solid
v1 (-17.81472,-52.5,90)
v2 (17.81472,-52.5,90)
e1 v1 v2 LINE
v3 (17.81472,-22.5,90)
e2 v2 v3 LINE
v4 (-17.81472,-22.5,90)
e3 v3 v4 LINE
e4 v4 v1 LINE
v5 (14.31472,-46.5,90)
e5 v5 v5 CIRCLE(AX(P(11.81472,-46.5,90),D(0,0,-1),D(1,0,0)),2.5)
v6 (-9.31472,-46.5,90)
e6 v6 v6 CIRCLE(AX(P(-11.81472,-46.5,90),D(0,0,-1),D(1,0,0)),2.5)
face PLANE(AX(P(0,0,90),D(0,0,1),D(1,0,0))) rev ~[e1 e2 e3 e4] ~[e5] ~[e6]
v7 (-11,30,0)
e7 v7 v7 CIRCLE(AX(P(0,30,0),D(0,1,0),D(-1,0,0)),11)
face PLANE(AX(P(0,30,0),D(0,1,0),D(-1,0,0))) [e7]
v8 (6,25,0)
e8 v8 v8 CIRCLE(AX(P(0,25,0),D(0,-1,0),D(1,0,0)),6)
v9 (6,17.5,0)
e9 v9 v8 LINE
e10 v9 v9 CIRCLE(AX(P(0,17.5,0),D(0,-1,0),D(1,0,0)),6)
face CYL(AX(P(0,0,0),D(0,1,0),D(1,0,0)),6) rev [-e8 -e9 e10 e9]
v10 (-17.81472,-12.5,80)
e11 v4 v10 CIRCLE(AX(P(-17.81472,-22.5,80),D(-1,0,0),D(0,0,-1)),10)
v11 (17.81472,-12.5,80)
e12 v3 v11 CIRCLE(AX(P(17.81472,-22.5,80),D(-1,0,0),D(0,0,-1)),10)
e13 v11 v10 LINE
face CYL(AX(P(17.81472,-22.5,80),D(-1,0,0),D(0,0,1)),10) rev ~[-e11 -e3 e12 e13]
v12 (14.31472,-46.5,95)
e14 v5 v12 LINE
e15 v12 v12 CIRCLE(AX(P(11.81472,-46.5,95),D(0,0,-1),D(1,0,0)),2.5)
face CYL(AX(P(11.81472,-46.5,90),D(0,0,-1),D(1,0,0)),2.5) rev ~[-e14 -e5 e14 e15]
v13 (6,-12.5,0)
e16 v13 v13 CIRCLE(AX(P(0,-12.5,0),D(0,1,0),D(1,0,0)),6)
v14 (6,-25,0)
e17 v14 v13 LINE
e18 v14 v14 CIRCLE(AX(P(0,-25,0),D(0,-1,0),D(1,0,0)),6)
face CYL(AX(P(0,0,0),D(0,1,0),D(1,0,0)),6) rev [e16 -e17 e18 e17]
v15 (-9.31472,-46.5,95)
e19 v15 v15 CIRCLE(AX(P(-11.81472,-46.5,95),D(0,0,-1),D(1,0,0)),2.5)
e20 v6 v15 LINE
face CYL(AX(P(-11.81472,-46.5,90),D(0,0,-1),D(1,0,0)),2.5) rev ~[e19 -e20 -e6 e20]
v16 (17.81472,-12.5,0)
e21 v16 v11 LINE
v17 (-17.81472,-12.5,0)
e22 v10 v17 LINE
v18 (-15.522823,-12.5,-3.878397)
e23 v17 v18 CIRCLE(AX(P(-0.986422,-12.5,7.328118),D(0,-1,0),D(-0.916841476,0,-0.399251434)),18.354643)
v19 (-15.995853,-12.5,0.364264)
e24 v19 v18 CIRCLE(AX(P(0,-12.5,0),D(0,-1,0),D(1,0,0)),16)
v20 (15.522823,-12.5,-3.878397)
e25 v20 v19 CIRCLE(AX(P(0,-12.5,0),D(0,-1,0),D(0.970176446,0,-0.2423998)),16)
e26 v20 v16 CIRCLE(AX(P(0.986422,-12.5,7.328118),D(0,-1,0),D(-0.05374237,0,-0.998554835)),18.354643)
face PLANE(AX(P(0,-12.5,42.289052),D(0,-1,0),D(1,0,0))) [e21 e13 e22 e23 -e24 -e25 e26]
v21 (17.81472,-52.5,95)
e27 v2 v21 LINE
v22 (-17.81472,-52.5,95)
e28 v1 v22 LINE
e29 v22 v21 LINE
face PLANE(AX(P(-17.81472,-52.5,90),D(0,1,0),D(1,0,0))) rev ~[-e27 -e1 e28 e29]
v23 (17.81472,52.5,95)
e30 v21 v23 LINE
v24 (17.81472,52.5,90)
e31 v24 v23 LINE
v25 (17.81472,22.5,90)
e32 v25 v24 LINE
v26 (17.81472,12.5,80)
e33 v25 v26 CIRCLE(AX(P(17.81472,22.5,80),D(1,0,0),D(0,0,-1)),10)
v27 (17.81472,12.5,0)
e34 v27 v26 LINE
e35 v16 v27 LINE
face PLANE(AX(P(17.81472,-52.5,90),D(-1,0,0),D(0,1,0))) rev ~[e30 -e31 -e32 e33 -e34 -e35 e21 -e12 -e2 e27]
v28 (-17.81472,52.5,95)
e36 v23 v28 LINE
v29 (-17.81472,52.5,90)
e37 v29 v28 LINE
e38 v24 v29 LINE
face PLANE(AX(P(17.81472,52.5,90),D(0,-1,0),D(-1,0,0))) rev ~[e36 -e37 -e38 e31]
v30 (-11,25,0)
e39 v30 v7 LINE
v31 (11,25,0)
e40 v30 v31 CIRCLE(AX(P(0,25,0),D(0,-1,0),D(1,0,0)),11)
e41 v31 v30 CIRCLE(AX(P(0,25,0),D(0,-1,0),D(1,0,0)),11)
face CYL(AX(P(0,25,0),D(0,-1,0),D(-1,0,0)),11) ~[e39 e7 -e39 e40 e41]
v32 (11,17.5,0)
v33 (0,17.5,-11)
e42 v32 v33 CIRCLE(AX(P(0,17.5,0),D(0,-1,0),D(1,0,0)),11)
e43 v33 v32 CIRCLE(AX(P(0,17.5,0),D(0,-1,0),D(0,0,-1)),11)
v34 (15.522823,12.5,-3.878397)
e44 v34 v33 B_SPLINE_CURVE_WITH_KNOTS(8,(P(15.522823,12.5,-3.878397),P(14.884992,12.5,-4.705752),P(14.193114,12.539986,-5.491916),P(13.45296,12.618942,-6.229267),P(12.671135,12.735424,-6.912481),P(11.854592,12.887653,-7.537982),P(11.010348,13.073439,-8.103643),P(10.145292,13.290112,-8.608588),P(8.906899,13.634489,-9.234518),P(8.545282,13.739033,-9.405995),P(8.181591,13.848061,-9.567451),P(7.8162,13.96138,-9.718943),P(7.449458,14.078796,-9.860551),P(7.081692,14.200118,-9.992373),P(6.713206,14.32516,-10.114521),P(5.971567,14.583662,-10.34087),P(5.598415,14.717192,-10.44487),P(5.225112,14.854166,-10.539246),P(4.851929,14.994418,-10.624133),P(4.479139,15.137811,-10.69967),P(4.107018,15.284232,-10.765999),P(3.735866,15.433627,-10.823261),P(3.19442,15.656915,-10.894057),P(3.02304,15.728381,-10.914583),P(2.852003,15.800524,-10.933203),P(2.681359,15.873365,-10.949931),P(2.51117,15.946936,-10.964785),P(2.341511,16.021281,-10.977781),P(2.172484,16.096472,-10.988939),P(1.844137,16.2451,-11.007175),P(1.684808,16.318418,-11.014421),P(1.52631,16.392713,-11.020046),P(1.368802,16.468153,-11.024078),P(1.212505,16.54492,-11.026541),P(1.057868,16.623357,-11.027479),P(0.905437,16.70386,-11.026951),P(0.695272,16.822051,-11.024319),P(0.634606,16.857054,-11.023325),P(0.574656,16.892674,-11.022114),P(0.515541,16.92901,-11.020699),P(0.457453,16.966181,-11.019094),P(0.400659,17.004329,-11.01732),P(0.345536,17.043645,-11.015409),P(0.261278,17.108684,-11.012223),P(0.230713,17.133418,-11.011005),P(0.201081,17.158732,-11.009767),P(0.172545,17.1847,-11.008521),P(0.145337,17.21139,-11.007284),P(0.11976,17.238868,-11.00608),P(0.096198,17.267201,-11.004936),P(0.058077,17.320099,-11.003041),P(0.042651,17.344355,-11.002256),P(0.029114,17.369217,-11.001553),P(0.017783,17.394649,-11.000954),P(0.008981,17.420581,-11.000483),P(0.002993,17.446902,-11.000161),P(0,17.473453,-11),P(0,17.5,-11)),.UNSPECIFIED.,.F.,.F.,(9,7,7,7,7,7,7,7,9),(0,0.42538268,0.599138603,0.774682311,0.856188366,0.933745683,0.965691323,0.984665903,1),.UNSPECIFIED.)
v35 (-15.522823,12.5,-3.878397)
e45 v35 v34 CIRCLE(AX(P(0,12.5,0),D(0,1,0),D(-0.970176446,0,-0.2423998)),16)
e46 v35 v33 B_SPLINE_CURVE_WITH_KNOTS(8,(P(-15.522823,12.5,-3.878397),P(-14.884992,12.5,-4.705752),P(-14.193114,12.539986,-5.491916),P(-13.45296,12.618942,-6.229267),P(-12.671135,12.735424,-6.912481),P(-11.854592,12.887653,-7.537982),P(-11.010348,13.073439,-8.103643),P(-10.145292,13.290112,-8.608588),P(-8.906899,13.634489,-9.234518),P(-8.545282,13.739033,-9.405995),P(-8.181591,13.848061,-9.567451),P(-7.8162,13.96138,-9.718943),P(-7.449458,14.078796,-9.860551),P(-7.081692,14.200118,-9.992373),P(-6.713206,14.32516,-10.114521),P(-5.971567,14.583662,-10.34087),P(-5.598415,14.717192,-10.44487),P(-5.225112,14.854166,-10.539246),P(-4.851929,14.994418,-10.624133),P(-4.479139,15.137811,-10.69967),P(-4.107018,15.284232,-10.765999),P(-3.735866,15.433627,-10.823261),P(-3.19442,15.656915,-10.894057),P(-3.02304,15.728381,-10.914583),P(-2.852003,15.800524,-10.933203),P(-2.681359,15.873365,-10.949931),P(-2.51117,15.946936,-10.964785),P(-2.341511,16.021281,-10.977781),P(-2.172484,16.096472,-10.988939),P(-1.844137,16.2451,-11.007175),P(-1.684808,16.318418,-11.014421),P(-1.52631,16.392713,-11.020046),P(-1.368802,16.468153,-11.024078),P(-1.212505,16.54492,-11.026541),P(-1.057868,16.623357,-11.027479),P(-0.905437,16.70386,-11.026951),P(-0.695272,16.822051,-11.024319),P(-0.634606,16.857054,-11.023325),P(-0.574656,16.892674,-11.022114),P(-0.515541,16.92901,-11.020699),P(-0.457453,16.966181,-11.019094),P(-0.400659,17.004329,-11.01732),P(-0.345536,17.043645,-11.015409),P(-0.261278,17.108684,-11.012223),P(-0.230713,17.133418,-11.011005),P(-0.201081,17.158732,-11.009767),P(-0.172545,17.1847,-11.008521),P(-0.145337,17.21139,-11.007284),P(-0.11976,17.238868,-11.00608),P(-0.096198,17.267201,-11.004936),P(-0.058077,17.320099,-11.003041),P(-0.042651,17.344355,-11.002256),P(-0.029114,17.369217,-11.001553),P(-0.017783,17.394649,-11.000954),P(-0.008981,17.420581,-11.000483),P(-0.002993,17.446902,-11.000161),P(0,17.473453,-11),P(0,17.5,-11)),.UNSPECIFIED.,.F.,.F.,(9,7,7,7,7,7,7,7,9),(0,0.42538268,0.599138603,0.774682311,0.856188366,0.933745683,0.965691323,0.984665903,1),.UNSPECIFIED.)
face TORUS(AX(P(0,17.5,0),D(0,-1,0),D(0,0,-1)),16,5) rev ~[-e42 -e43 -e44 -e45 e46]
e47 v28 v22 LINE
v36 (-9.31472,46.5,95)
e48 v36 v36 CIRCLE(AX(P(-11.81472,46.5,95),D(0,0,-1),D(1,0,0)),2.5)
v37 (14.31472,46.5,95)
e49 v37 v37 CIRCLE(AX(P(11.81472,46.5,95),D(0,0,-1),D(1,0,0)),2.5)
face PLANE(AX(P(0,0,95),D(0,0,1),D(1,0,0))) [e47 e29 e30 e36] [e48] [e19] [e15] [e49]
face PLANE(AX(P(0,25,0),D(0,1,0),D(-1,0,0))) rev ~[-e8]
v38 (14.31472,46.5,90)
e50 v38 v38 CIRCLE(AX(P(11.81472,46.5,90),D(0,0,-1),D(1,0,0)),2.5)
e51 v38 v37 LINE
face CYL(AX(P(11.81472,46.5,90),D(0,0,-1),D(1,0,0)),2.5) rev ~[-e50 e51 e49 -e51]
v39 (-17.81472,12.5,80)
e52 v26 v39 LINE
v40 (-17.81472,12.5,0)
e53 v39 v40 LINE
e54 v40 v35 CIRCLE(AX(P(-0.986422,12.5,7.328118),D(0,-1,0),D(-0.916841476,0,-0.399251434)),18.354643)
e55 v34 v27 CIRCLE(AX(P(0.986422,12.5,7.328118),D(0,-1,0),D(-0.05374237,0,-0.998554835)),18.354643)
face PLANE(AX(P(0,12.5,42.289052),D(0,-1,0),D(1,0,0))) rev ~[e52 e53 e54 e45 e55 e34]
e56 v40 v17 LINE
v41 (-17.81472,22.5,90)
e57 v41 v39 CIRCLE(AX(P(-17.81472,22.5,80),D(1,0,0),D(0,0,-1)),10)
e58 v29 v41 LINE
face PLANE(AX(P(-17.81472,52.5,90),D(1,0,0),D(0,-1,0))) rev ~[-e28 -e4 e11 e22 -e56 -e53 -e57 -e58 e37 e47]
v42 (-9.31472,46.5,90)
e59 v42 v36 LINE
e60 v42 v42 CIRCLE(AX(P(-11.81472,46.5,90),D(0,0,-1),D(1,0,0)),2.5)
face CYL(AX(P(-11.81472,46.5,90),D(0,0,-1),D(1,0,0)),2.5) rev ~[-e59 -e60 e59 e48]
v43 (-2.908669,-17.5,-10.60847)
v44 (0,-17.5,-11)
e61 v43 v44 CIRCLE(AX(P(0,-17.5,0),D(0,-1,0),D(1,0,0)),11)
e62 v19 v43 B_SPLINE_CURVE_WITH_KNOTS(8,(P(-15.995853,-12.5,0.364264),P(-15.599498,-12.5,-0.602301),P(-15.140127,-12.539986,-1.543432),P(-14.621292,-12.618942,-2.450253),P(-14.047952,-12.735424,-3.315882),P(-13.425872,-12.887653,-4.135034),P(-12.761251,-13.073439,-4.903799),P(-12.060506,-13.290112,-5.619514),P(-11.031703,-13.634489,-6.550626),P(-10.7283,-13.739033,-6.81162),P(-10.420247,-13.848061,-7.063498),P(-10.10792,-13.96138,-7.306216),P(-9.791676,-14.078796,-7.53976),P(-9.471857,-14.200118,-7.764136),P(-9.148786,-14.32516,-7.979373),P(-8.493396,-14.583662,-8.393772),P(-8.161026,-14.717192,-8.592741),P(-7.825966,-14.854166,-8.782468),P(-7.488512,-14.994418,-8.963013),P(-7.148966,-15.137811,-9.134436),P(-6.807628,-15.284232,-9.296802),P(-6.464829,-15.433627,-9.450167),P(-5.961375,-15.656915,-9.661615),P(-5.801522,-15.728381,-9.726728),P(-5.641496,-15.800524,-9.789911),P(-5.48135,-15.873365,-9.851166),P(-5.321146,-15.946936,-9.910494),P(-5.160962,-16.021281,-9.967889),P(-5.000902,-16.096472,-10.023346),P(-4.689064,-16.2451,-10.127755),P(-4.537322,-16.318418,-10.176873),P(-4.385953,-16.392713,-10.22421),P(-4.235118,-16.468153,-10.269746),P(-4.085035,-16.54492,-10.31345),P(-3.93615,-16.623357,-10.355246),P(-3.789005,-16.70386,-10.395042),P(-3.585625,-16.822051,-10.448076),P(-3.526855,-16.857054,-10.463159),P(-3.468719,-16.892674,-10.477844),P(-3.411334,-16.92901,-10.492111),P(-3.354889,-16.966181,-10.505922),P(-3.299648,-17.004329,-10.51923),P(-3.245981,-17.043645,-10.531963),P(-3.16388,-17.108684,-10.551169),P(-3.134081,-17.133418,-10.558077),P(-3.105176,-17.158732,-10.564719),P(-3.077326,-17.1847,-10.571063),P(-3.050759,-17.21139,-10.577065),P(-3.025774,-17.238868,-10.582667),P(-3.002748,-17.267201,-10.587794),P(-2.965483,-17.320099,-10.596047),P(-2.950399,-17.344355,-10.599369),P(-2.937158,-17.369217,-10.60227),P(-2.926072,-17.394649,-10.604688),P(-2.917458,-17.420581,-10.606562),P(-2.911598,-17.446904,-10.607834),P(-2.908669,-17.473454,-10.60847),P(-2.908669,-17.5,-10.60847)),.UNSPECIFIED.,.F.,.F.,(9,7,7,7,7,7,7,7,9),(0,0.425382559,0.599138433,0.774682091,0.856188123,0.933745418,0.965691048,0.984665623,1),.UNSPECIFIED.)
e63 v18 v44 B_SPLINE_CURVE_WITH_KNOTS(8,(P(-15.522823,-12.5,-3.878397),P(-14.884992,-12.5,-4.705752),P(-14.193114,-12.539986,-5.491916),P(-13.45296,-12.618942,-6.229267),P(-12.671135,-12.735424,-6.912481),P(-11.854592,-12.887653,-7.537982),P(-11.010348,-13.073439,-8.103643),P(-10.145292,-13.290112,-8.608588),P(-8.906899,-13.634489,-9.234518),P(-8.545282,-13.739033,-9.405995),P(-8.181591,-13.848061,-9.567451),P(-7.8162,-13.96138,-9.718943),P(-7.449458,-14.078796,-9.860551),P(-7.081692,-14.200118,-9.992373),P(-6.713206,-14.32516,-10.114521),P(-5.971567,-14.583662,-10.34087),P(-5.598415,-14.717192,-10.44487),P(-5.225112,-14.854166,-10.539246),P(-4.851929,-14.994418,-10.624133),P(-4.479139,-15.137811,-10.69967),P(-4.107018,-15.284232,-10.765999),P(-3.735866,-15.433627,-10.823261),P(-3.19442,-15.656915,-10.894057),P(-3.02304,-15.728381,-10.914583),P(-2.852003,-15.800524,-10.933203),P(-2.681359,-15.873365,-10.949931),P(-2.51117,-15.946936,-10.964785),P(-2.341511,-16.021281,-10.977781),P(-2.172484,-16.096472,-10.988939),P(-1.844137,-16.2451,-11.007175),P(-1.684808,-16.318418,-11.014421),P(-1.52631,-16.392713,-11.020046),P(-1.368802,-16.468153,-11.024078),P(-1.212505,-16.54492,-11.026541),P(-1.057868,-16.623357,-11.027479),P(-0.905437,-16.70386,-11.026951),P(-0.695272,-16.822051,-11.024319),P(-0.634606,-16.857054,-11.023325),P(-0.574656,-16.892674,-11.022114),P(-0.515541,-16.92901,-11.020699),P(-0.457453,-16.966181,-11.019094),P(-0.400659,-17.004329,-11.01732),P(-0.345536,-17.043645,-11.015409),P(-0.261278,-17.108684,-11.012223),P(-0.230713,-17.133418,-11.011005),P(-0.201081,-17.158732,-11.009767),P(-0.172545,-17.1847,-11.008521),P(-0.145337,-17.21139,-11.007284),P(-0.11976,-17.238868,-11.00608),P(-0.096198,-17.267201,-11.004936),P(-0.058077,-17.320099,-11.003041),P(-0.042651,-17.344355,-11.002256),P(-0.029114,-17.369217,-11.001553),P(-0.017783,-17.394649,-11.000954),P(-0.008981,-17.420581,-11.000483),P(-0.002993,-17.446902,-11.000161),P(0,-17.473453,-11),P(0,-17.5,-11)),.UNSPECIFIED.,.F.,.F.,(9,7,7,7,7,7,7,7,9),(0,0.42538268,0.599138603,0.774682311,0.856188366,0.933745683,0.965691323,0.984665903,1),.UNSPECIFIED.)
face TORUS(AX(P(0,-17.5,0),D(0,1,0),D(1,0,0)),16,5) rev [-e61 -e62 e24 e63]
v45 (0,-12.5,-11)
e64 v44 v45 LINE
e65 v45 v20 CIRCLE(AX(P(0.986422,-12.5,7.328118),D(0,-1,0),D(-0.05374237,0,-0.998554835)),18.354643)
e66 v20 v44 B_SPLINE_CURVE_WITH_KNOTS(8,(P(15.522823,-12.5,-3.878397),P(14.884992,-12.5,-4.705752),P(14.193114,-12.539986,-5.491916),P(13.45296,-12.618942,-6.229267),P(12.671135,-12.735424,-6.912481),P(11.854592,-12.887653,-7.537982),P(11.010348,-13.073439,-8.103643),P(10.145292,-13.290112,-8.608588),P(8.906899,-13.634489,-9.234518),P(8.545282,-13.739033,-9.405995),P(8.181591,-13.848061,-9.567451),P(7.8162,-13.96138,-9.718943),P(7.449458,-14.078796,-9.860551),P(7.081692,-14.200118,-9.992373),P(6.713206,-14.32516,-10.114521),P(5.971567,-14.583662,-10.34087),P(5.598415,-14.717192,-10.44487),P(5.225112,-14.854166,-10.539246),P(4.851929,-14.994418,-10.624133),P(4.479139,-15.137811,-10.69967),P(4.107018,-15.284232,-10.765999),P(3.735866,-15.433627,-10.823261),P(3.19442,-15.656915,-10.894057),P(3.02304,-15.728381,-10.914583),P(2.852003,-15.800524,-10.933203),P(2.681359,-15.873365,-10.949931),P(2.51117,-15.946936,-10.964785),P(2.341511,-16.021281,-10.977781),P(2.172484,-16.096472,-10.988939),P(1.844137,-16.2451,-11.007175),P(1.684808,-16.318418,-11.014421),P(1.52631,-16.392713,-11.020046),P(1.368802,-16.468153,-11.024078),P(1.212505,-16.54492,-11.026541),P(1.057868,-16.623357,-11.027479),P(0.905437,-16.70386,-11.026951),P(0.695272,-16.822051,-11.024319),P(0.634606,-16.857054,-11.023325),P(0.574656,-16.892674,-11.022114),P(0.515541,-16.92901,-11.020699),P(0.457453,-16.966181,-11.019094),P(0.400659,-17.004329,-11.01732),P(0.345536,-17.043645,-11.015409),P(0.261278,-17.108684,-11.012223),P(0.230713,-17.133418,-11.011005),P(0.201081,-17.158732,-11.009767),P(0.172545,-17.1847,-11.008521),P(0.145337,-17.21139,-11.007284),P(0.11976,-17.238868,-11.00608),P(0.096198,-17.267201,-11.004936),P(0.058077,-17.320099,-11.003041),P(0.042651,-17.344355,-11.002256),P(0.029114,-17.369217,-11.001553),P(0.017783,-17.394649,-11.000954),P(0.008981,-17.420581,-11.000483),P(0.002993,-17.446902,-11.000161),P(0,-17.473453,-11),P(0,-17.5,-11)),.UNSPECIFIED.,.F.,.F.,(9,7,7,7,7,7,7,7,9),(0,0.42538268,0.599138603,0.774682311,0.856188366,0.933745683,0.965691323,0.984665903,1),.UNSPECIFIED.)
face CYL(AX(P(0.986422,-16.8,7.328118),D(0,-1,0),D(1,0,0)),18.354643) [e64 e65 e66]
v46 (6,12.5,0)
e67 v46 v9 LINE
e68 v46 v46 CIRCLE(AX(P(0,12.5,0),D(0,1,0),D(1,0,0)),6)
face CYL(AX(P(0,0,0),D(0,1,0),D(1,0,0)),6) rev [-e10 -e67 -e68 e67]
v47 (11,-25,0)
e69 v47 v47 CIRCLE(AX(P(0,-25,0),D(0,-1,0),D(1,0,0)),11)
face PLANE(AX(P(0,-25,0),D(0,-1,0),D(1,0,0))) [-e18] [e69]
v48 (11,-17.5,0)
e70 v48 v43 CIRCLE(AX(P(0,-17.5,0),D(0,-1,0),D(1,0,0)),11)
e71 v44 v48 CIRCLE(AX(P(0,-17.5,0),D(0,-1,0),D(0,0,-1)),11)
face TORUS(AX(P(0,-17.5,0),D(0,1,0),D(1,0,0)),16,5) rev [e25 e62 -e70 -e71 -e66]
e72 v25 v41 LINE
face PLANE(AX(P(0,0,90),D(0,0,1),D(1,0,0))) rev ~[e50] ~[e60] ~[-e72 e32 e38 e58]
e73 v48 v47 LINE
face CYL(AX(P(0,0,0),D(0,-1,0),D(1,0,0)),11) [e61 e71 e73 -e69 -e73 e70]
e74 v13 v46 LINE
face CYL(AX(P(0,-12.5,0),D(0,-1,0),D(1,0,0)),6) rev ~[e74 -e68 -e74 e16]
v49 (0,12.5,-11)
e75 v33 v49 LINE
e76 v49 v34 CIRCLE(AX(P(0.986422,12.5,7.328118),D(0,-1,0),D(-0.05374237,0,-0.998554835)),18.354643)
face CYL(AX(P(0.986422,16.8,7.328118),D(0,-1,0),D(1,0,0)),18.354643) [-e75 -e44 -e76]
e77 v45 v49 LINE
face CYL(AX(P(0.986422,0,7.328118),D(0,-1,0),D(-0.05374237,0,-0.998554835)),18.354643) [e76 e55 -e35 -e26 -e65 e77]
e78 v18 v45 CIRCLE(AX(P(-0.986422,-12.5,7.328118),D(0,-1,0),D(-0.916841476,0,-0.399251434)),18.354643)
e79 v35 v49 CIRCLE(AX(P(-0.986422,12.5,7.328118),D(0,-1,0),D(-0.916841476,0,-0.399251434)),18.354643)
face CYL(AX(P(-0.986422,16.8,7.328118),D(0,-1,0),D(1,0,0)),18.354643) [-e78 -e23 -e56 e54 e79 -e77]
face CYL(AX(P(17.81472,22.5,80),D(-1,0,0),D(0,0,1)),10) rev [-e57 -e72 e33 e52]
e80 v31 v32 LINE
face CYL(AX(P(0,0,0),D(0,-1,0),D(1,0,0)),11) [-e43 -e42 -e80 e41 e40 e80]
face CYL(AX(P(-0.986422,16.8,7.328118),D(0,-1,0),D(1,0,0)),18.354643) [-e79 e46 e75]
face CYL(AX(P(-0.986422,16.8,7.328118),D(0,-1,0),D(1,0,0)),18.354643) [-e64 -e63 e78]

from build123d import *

# Parameters (mm, degrees)
F0_R         = 11
F0_R_2       = 6
F1_DEPTH     = 25
F2_R         = 11
F3_DEPTH     = 5
F5_DEPTH     = 12.5
F7_DEPTH     = 5
F8_R         = 10
F9_T4_ANGLE  = 90
F9_S5_R      = 18.3546430422
F9_T6_DEPTH  = 14
F9_T10_ANGLE = 270
F9_S11_R     = 18.3546430422
F9_T12_DEPTH = 26
F9_T16_ANGLE = 270
F9_S17_R     = 18.3546430422
F9_T18_DEPTH = 26
F9_T22_ANGLE = 270
F9_S23_R     = 18.3546430422
F9_T24_DEPTH = 26
F9_T28_ANGLE = 270
F9_S29_R     = 18.3546430422
F9_T30_DEPTH = 26
F9_T34_ANGLE = 90
F9_S35_R     = 18.3546430422
F9_T36_DEPTH = 14
F10_R        = 6
F11_DEPTH    = 30
F12_R        = 2.5
F13_DEPTH    = 5.001


# Not quite as in the source:
# - a fillet or chamfer that OpenCascade refuses, or shapes differently, is made with other operations: its cross-section is extruded or revolved along the edge and cut away or added


with BuildPart() as f1:
    # F0 (on Front) → F1 (new body, symmetric)
    with BuildSketch(Plane.XZ):
        Circle(F0_R)
        Circle(F0_R_2, mode=Mode.SUBTRACT)
    extrude(amount=F1_DEPTH, both=True)

    # F2 (on face) → F3 (join)
    with BuildSketch(Plane(origin=(0, 25, 0), x_dir=(-1, 0, 0), z_dir=(0, 1, 0))):
        Circle(F2_R)
    extrude(amount=F3_DEPTH)

    # F4 (on Front) → F5 (join, symmetric)
    with BuildSketch(Plane.XZ):
        with BuildLine():
            ThreePointArc((-17.8147200495, 0), (-10.6296195649, -8.2892337781), (0, -11))
            ThreePointArc((0, -11), (10.6296195649, -8.2892337781), (17.8147200495, 0))
            Line((17.8147200495, 0), (17.8147200495, 90))
            Line((17.8147200495, 90), (-17.8147200495, 90))
            Line((-17.8147200495, 90), (-17.8147200495, 0))
        make_face()
        with BuildLine():
            ThreePointArc((0, -11), (-7.7781745931, 7.7781745931), (11, 0))
            ThreePointArc((11, 0), (7.7781745931, -7.7781745931), (0, -11))
        make_face(mode=Mode.SUBTRACT)
        with BuildLine():
            ThreePointArc((0, -11), (7.7781745931, -7.7781745931), (11, 0))
            ThreePointArc((11, 0), (-7.7781745931, 7.7781745931), (0, -11))
        make_face()
    extrude(amount=F5_DEPTH, both=True)

    # F6 (on face) → F7 (join)
    with BuildSketch(Plane.XY.offset(90)):
        Polygon((17.8147200495, -52.5), (17.8147200495, -12.5), (17.8147200495, 12.5), (17.8147200495, 52.5), (-17.8147200495, 52.5), (-17.8147200495, 12.5), (-17.8147200495, -12.5), (-17.8147200495, -52.5), align=None)
    extrude(amount=F7_DEPTH)

    # F8
    f8_edges = [f1.edges().sort_by_distance(p)[0] for p in [
        (0, -12.5, 90),
        (0, 12.5, 90),
    ]]
    fillet(f8_edges, radius=F8_R)

    # F9: fillet of radius 5 on 4 edges, made by hand


with BuildPart() as f9_tool2:
    # F9_s3 → F9_t4 (revolve)
    with BuildSketch(Plane.YZ):
        with BuildLine():
            ThreePointArc((-12.5, -16), (-13.9644660941, -12.4644660941), (-17.5, -11))
            Line((-17.5, -11), (-12.5, -11))
            Line((-12.5, -11), (-12.5, -16))
        make_face()
    revolve(axis=Axis((0, -12.5, 0), (0, -1, 0)), revolution_arc=F9_T4_ANGLE)

    # F9_s5 → F9_t6 (intersect, symmetric)
    with BuildSketch(Plane.XZ.offset(16.8)):
        with Locations((0.9864220241, 7.3281175465)):
            Circle(F9_S5_R)
    extrude(amount=F9_T6_DEPTH, both=True, mode=Mode.INTERSECT)


with BuildPart() as f1_1:
    add(f1.part)

    # F9_t1: union F9_tool2
    add(f9_tool2.part)


with BuildPart() as f9_tool8:
    # F9_s9 → F9_t10 (revolve)
    with BuildSketch(Plane.XY):
        with BuildLine():
            ThreePointArc((16, -12.5), (12.4644660941, -13.9644660941), (11, -17.5))
            Line((11, -17.5), (11, -12.5))
            Line((11, -12.5), (16, -12.5))
        make_face()
    revolve(axis=Axis((0, -12.5, 0), (0, -1, 0)), revolution_arc=F9_T10_ANGLE)

    # F9_s11 → F9_t12 (intersect, symmetric)
    with BuildSketch(Plane.XZ.offset(16.8)):
        with Locations((0.9864220241, 7.3281175465)):
            Circle(F9_S11_R)
    extrude(amount=F9_T12_DEPTH, both=True, mode=Mode.INTERSECT)


with BuildPart() as f1_2:
    add(f1_1.part)

    # F9_t7: union F9_tool8
    add(f9_tool8.part)


with BuildPart() as f9_tool14:
    # F9_s15 → F9_t16 (revolve)
    with BuildSketch(Plane.XY):
        with BuildLine():
            ThreePointArc((16, -12.5), (12.4644660941, -13.9644660941), (11, -17.5))
            Line((11, -17.5), (11, -12.5))
            Line((11, -12.5), (16, -12.5))
        make_face()
    revolve(axis=Axis((0, -12.5, 0), (0, -1, 0)), revolution_arc=F9_T16_ANGLE)

    # F9_s17 → F9_t18 (intersect, symmetric)
    with BuildSketch(Plane.XZ.offset(16.8)):
        with Locations((-0.9864220241, 7.3281175465)):
            Circle(F9_S17_R)
    extrude(amount=F9_T18_DEPTH, both=True, mode=Mode.INTERSECT)


with BuildPart() as f1_3:
    add(f1_2.part)

    # F9_t13: union F9_tool14
    add(f9_tool14.part)


with BuildPart() as f9_tool20:
    # F9_s21 → F9_t22 (revolve)
    with BuildSketch(Plane.XY):
        with BuildLine():
            ThreePointArc((16, 12.5), (12.4644660941, 13.9644660941), (11, 17.5))
            Line((11, 17.5), (11, 12.5))
            Line((11, 12.5), (16, 12.5))
        make_face()
    revolve(axis=Axis((0, 12.5, 0), (0, -1, 0)), revolution_arc=F9_T22_ANGLE)

    # F9_s23 → F9_t24 (intersect, symmetric)
    with BuildSketch(Plane.XZ.offset(-16.8)):
        with Locations((0.9864220241, 7.3281175465)):
            Circle(F9_S23_R)
    extrude(amount=F9_T24_DEPTH, both=True, mode=Mode.INTERSECT)


with BuildPart() as f1_4:
    add(f1_3.part)

    # F9_t19: union F9_tool20
    add(f9_tool20.part)


with BuildPart() as f9_tool26:
    # F9_s27 → F9_t28 (revolve)
    with BuildSketch(Plane.XY):
        with BuildLine():
            ThreePointArc((16, 12.5), (12.4644660941, 13.9644660941), (11, 17.5))
            Line((11, 17.5), (11, 12.5))
            Line((11, 12.5), (16, 12.5))
        make_face()
    revolve(axis=Axis((0, 12.5, 0), (0, -1, 0)), revolution_arc=F9_T28_ANGLE)

    # F9_s29 → F9_t30 (intersect, symmetric)
    with BuildSketch(Plane.XZ.offset(-16.8)):
        with Locations((-0.9864220241, 7.3281175465)):
            Circle(F9_S29_R)
    extrude(amount=F9_T30_DEPTH, both=True, mode=Mode.INTERSECT)


with BuildPart() as f1_5:
    add(f1_4.part)

    # F9_t25: union F9_tool26
    add(f9_tool26.part)


with BuildPart() as f9_tool32:
    # F9_s33 → F9_t34 (revolve)
    with BuildSketch(Plane.YZ):
        with BuildLine():
            ThreePointArc((12.5, -16), (13.9644660941, -12.4644660941), (17.5, -11))
            Line((17.5, -11), (12.5, -11))
            Line((12.5, -11), (12.5, -16))
        make_face()
    revolve(axis=Axis((0, 12.5, 0), (0, -1, 0)), revolution_arc=F9_T34_ANGLE)

    # F9_s35 → F9_t36 (intersect, symmetric)
    with BuildSketch(Plane.XZ.offset(-16.8)):
        with Locations((0.9864220241, 7.3281175465)):
            Circle(F9_S35_R)
    extrude(amount=F9_T36_DEPTH, both=True, mode=Mode.INTERSECT)


with BuildPart() as f1_6:
    add(f1_5.part)

    # F9_t31: union F9_tool32
    add(f9_tool32.part)

    # F10 (on face) → F11 (cut)
    with BuildSketch(Plane.XZ.offset(12.5)):
        Circle(F10_R)
    extrude(amount=-F11_DEPTH, mode=Mode.SUBTRACT)

    # F12 (on face) → F13 (cut, through all)
    with BuildSketch(Plane(origin=(0, 0, 90), x_dir=(1, 0, 0), z_dir=(0, 0, -1))):
        with Locations((-11.8147200495, 46.5)):
            Circle(F12_R)
        with Locations((11.8147200495, 46.5)):
            Circle(F12_R)
        with Locations((-11.8147200495, -46.5)):
            Circle(F12_R)
        with Locations((11.8147200495, -46.5)):
            Circle(F12_R)
    extrude(amount=-F13_DEPTH, mode=Mode.SUBTRACT)


solid = f1_6.part
